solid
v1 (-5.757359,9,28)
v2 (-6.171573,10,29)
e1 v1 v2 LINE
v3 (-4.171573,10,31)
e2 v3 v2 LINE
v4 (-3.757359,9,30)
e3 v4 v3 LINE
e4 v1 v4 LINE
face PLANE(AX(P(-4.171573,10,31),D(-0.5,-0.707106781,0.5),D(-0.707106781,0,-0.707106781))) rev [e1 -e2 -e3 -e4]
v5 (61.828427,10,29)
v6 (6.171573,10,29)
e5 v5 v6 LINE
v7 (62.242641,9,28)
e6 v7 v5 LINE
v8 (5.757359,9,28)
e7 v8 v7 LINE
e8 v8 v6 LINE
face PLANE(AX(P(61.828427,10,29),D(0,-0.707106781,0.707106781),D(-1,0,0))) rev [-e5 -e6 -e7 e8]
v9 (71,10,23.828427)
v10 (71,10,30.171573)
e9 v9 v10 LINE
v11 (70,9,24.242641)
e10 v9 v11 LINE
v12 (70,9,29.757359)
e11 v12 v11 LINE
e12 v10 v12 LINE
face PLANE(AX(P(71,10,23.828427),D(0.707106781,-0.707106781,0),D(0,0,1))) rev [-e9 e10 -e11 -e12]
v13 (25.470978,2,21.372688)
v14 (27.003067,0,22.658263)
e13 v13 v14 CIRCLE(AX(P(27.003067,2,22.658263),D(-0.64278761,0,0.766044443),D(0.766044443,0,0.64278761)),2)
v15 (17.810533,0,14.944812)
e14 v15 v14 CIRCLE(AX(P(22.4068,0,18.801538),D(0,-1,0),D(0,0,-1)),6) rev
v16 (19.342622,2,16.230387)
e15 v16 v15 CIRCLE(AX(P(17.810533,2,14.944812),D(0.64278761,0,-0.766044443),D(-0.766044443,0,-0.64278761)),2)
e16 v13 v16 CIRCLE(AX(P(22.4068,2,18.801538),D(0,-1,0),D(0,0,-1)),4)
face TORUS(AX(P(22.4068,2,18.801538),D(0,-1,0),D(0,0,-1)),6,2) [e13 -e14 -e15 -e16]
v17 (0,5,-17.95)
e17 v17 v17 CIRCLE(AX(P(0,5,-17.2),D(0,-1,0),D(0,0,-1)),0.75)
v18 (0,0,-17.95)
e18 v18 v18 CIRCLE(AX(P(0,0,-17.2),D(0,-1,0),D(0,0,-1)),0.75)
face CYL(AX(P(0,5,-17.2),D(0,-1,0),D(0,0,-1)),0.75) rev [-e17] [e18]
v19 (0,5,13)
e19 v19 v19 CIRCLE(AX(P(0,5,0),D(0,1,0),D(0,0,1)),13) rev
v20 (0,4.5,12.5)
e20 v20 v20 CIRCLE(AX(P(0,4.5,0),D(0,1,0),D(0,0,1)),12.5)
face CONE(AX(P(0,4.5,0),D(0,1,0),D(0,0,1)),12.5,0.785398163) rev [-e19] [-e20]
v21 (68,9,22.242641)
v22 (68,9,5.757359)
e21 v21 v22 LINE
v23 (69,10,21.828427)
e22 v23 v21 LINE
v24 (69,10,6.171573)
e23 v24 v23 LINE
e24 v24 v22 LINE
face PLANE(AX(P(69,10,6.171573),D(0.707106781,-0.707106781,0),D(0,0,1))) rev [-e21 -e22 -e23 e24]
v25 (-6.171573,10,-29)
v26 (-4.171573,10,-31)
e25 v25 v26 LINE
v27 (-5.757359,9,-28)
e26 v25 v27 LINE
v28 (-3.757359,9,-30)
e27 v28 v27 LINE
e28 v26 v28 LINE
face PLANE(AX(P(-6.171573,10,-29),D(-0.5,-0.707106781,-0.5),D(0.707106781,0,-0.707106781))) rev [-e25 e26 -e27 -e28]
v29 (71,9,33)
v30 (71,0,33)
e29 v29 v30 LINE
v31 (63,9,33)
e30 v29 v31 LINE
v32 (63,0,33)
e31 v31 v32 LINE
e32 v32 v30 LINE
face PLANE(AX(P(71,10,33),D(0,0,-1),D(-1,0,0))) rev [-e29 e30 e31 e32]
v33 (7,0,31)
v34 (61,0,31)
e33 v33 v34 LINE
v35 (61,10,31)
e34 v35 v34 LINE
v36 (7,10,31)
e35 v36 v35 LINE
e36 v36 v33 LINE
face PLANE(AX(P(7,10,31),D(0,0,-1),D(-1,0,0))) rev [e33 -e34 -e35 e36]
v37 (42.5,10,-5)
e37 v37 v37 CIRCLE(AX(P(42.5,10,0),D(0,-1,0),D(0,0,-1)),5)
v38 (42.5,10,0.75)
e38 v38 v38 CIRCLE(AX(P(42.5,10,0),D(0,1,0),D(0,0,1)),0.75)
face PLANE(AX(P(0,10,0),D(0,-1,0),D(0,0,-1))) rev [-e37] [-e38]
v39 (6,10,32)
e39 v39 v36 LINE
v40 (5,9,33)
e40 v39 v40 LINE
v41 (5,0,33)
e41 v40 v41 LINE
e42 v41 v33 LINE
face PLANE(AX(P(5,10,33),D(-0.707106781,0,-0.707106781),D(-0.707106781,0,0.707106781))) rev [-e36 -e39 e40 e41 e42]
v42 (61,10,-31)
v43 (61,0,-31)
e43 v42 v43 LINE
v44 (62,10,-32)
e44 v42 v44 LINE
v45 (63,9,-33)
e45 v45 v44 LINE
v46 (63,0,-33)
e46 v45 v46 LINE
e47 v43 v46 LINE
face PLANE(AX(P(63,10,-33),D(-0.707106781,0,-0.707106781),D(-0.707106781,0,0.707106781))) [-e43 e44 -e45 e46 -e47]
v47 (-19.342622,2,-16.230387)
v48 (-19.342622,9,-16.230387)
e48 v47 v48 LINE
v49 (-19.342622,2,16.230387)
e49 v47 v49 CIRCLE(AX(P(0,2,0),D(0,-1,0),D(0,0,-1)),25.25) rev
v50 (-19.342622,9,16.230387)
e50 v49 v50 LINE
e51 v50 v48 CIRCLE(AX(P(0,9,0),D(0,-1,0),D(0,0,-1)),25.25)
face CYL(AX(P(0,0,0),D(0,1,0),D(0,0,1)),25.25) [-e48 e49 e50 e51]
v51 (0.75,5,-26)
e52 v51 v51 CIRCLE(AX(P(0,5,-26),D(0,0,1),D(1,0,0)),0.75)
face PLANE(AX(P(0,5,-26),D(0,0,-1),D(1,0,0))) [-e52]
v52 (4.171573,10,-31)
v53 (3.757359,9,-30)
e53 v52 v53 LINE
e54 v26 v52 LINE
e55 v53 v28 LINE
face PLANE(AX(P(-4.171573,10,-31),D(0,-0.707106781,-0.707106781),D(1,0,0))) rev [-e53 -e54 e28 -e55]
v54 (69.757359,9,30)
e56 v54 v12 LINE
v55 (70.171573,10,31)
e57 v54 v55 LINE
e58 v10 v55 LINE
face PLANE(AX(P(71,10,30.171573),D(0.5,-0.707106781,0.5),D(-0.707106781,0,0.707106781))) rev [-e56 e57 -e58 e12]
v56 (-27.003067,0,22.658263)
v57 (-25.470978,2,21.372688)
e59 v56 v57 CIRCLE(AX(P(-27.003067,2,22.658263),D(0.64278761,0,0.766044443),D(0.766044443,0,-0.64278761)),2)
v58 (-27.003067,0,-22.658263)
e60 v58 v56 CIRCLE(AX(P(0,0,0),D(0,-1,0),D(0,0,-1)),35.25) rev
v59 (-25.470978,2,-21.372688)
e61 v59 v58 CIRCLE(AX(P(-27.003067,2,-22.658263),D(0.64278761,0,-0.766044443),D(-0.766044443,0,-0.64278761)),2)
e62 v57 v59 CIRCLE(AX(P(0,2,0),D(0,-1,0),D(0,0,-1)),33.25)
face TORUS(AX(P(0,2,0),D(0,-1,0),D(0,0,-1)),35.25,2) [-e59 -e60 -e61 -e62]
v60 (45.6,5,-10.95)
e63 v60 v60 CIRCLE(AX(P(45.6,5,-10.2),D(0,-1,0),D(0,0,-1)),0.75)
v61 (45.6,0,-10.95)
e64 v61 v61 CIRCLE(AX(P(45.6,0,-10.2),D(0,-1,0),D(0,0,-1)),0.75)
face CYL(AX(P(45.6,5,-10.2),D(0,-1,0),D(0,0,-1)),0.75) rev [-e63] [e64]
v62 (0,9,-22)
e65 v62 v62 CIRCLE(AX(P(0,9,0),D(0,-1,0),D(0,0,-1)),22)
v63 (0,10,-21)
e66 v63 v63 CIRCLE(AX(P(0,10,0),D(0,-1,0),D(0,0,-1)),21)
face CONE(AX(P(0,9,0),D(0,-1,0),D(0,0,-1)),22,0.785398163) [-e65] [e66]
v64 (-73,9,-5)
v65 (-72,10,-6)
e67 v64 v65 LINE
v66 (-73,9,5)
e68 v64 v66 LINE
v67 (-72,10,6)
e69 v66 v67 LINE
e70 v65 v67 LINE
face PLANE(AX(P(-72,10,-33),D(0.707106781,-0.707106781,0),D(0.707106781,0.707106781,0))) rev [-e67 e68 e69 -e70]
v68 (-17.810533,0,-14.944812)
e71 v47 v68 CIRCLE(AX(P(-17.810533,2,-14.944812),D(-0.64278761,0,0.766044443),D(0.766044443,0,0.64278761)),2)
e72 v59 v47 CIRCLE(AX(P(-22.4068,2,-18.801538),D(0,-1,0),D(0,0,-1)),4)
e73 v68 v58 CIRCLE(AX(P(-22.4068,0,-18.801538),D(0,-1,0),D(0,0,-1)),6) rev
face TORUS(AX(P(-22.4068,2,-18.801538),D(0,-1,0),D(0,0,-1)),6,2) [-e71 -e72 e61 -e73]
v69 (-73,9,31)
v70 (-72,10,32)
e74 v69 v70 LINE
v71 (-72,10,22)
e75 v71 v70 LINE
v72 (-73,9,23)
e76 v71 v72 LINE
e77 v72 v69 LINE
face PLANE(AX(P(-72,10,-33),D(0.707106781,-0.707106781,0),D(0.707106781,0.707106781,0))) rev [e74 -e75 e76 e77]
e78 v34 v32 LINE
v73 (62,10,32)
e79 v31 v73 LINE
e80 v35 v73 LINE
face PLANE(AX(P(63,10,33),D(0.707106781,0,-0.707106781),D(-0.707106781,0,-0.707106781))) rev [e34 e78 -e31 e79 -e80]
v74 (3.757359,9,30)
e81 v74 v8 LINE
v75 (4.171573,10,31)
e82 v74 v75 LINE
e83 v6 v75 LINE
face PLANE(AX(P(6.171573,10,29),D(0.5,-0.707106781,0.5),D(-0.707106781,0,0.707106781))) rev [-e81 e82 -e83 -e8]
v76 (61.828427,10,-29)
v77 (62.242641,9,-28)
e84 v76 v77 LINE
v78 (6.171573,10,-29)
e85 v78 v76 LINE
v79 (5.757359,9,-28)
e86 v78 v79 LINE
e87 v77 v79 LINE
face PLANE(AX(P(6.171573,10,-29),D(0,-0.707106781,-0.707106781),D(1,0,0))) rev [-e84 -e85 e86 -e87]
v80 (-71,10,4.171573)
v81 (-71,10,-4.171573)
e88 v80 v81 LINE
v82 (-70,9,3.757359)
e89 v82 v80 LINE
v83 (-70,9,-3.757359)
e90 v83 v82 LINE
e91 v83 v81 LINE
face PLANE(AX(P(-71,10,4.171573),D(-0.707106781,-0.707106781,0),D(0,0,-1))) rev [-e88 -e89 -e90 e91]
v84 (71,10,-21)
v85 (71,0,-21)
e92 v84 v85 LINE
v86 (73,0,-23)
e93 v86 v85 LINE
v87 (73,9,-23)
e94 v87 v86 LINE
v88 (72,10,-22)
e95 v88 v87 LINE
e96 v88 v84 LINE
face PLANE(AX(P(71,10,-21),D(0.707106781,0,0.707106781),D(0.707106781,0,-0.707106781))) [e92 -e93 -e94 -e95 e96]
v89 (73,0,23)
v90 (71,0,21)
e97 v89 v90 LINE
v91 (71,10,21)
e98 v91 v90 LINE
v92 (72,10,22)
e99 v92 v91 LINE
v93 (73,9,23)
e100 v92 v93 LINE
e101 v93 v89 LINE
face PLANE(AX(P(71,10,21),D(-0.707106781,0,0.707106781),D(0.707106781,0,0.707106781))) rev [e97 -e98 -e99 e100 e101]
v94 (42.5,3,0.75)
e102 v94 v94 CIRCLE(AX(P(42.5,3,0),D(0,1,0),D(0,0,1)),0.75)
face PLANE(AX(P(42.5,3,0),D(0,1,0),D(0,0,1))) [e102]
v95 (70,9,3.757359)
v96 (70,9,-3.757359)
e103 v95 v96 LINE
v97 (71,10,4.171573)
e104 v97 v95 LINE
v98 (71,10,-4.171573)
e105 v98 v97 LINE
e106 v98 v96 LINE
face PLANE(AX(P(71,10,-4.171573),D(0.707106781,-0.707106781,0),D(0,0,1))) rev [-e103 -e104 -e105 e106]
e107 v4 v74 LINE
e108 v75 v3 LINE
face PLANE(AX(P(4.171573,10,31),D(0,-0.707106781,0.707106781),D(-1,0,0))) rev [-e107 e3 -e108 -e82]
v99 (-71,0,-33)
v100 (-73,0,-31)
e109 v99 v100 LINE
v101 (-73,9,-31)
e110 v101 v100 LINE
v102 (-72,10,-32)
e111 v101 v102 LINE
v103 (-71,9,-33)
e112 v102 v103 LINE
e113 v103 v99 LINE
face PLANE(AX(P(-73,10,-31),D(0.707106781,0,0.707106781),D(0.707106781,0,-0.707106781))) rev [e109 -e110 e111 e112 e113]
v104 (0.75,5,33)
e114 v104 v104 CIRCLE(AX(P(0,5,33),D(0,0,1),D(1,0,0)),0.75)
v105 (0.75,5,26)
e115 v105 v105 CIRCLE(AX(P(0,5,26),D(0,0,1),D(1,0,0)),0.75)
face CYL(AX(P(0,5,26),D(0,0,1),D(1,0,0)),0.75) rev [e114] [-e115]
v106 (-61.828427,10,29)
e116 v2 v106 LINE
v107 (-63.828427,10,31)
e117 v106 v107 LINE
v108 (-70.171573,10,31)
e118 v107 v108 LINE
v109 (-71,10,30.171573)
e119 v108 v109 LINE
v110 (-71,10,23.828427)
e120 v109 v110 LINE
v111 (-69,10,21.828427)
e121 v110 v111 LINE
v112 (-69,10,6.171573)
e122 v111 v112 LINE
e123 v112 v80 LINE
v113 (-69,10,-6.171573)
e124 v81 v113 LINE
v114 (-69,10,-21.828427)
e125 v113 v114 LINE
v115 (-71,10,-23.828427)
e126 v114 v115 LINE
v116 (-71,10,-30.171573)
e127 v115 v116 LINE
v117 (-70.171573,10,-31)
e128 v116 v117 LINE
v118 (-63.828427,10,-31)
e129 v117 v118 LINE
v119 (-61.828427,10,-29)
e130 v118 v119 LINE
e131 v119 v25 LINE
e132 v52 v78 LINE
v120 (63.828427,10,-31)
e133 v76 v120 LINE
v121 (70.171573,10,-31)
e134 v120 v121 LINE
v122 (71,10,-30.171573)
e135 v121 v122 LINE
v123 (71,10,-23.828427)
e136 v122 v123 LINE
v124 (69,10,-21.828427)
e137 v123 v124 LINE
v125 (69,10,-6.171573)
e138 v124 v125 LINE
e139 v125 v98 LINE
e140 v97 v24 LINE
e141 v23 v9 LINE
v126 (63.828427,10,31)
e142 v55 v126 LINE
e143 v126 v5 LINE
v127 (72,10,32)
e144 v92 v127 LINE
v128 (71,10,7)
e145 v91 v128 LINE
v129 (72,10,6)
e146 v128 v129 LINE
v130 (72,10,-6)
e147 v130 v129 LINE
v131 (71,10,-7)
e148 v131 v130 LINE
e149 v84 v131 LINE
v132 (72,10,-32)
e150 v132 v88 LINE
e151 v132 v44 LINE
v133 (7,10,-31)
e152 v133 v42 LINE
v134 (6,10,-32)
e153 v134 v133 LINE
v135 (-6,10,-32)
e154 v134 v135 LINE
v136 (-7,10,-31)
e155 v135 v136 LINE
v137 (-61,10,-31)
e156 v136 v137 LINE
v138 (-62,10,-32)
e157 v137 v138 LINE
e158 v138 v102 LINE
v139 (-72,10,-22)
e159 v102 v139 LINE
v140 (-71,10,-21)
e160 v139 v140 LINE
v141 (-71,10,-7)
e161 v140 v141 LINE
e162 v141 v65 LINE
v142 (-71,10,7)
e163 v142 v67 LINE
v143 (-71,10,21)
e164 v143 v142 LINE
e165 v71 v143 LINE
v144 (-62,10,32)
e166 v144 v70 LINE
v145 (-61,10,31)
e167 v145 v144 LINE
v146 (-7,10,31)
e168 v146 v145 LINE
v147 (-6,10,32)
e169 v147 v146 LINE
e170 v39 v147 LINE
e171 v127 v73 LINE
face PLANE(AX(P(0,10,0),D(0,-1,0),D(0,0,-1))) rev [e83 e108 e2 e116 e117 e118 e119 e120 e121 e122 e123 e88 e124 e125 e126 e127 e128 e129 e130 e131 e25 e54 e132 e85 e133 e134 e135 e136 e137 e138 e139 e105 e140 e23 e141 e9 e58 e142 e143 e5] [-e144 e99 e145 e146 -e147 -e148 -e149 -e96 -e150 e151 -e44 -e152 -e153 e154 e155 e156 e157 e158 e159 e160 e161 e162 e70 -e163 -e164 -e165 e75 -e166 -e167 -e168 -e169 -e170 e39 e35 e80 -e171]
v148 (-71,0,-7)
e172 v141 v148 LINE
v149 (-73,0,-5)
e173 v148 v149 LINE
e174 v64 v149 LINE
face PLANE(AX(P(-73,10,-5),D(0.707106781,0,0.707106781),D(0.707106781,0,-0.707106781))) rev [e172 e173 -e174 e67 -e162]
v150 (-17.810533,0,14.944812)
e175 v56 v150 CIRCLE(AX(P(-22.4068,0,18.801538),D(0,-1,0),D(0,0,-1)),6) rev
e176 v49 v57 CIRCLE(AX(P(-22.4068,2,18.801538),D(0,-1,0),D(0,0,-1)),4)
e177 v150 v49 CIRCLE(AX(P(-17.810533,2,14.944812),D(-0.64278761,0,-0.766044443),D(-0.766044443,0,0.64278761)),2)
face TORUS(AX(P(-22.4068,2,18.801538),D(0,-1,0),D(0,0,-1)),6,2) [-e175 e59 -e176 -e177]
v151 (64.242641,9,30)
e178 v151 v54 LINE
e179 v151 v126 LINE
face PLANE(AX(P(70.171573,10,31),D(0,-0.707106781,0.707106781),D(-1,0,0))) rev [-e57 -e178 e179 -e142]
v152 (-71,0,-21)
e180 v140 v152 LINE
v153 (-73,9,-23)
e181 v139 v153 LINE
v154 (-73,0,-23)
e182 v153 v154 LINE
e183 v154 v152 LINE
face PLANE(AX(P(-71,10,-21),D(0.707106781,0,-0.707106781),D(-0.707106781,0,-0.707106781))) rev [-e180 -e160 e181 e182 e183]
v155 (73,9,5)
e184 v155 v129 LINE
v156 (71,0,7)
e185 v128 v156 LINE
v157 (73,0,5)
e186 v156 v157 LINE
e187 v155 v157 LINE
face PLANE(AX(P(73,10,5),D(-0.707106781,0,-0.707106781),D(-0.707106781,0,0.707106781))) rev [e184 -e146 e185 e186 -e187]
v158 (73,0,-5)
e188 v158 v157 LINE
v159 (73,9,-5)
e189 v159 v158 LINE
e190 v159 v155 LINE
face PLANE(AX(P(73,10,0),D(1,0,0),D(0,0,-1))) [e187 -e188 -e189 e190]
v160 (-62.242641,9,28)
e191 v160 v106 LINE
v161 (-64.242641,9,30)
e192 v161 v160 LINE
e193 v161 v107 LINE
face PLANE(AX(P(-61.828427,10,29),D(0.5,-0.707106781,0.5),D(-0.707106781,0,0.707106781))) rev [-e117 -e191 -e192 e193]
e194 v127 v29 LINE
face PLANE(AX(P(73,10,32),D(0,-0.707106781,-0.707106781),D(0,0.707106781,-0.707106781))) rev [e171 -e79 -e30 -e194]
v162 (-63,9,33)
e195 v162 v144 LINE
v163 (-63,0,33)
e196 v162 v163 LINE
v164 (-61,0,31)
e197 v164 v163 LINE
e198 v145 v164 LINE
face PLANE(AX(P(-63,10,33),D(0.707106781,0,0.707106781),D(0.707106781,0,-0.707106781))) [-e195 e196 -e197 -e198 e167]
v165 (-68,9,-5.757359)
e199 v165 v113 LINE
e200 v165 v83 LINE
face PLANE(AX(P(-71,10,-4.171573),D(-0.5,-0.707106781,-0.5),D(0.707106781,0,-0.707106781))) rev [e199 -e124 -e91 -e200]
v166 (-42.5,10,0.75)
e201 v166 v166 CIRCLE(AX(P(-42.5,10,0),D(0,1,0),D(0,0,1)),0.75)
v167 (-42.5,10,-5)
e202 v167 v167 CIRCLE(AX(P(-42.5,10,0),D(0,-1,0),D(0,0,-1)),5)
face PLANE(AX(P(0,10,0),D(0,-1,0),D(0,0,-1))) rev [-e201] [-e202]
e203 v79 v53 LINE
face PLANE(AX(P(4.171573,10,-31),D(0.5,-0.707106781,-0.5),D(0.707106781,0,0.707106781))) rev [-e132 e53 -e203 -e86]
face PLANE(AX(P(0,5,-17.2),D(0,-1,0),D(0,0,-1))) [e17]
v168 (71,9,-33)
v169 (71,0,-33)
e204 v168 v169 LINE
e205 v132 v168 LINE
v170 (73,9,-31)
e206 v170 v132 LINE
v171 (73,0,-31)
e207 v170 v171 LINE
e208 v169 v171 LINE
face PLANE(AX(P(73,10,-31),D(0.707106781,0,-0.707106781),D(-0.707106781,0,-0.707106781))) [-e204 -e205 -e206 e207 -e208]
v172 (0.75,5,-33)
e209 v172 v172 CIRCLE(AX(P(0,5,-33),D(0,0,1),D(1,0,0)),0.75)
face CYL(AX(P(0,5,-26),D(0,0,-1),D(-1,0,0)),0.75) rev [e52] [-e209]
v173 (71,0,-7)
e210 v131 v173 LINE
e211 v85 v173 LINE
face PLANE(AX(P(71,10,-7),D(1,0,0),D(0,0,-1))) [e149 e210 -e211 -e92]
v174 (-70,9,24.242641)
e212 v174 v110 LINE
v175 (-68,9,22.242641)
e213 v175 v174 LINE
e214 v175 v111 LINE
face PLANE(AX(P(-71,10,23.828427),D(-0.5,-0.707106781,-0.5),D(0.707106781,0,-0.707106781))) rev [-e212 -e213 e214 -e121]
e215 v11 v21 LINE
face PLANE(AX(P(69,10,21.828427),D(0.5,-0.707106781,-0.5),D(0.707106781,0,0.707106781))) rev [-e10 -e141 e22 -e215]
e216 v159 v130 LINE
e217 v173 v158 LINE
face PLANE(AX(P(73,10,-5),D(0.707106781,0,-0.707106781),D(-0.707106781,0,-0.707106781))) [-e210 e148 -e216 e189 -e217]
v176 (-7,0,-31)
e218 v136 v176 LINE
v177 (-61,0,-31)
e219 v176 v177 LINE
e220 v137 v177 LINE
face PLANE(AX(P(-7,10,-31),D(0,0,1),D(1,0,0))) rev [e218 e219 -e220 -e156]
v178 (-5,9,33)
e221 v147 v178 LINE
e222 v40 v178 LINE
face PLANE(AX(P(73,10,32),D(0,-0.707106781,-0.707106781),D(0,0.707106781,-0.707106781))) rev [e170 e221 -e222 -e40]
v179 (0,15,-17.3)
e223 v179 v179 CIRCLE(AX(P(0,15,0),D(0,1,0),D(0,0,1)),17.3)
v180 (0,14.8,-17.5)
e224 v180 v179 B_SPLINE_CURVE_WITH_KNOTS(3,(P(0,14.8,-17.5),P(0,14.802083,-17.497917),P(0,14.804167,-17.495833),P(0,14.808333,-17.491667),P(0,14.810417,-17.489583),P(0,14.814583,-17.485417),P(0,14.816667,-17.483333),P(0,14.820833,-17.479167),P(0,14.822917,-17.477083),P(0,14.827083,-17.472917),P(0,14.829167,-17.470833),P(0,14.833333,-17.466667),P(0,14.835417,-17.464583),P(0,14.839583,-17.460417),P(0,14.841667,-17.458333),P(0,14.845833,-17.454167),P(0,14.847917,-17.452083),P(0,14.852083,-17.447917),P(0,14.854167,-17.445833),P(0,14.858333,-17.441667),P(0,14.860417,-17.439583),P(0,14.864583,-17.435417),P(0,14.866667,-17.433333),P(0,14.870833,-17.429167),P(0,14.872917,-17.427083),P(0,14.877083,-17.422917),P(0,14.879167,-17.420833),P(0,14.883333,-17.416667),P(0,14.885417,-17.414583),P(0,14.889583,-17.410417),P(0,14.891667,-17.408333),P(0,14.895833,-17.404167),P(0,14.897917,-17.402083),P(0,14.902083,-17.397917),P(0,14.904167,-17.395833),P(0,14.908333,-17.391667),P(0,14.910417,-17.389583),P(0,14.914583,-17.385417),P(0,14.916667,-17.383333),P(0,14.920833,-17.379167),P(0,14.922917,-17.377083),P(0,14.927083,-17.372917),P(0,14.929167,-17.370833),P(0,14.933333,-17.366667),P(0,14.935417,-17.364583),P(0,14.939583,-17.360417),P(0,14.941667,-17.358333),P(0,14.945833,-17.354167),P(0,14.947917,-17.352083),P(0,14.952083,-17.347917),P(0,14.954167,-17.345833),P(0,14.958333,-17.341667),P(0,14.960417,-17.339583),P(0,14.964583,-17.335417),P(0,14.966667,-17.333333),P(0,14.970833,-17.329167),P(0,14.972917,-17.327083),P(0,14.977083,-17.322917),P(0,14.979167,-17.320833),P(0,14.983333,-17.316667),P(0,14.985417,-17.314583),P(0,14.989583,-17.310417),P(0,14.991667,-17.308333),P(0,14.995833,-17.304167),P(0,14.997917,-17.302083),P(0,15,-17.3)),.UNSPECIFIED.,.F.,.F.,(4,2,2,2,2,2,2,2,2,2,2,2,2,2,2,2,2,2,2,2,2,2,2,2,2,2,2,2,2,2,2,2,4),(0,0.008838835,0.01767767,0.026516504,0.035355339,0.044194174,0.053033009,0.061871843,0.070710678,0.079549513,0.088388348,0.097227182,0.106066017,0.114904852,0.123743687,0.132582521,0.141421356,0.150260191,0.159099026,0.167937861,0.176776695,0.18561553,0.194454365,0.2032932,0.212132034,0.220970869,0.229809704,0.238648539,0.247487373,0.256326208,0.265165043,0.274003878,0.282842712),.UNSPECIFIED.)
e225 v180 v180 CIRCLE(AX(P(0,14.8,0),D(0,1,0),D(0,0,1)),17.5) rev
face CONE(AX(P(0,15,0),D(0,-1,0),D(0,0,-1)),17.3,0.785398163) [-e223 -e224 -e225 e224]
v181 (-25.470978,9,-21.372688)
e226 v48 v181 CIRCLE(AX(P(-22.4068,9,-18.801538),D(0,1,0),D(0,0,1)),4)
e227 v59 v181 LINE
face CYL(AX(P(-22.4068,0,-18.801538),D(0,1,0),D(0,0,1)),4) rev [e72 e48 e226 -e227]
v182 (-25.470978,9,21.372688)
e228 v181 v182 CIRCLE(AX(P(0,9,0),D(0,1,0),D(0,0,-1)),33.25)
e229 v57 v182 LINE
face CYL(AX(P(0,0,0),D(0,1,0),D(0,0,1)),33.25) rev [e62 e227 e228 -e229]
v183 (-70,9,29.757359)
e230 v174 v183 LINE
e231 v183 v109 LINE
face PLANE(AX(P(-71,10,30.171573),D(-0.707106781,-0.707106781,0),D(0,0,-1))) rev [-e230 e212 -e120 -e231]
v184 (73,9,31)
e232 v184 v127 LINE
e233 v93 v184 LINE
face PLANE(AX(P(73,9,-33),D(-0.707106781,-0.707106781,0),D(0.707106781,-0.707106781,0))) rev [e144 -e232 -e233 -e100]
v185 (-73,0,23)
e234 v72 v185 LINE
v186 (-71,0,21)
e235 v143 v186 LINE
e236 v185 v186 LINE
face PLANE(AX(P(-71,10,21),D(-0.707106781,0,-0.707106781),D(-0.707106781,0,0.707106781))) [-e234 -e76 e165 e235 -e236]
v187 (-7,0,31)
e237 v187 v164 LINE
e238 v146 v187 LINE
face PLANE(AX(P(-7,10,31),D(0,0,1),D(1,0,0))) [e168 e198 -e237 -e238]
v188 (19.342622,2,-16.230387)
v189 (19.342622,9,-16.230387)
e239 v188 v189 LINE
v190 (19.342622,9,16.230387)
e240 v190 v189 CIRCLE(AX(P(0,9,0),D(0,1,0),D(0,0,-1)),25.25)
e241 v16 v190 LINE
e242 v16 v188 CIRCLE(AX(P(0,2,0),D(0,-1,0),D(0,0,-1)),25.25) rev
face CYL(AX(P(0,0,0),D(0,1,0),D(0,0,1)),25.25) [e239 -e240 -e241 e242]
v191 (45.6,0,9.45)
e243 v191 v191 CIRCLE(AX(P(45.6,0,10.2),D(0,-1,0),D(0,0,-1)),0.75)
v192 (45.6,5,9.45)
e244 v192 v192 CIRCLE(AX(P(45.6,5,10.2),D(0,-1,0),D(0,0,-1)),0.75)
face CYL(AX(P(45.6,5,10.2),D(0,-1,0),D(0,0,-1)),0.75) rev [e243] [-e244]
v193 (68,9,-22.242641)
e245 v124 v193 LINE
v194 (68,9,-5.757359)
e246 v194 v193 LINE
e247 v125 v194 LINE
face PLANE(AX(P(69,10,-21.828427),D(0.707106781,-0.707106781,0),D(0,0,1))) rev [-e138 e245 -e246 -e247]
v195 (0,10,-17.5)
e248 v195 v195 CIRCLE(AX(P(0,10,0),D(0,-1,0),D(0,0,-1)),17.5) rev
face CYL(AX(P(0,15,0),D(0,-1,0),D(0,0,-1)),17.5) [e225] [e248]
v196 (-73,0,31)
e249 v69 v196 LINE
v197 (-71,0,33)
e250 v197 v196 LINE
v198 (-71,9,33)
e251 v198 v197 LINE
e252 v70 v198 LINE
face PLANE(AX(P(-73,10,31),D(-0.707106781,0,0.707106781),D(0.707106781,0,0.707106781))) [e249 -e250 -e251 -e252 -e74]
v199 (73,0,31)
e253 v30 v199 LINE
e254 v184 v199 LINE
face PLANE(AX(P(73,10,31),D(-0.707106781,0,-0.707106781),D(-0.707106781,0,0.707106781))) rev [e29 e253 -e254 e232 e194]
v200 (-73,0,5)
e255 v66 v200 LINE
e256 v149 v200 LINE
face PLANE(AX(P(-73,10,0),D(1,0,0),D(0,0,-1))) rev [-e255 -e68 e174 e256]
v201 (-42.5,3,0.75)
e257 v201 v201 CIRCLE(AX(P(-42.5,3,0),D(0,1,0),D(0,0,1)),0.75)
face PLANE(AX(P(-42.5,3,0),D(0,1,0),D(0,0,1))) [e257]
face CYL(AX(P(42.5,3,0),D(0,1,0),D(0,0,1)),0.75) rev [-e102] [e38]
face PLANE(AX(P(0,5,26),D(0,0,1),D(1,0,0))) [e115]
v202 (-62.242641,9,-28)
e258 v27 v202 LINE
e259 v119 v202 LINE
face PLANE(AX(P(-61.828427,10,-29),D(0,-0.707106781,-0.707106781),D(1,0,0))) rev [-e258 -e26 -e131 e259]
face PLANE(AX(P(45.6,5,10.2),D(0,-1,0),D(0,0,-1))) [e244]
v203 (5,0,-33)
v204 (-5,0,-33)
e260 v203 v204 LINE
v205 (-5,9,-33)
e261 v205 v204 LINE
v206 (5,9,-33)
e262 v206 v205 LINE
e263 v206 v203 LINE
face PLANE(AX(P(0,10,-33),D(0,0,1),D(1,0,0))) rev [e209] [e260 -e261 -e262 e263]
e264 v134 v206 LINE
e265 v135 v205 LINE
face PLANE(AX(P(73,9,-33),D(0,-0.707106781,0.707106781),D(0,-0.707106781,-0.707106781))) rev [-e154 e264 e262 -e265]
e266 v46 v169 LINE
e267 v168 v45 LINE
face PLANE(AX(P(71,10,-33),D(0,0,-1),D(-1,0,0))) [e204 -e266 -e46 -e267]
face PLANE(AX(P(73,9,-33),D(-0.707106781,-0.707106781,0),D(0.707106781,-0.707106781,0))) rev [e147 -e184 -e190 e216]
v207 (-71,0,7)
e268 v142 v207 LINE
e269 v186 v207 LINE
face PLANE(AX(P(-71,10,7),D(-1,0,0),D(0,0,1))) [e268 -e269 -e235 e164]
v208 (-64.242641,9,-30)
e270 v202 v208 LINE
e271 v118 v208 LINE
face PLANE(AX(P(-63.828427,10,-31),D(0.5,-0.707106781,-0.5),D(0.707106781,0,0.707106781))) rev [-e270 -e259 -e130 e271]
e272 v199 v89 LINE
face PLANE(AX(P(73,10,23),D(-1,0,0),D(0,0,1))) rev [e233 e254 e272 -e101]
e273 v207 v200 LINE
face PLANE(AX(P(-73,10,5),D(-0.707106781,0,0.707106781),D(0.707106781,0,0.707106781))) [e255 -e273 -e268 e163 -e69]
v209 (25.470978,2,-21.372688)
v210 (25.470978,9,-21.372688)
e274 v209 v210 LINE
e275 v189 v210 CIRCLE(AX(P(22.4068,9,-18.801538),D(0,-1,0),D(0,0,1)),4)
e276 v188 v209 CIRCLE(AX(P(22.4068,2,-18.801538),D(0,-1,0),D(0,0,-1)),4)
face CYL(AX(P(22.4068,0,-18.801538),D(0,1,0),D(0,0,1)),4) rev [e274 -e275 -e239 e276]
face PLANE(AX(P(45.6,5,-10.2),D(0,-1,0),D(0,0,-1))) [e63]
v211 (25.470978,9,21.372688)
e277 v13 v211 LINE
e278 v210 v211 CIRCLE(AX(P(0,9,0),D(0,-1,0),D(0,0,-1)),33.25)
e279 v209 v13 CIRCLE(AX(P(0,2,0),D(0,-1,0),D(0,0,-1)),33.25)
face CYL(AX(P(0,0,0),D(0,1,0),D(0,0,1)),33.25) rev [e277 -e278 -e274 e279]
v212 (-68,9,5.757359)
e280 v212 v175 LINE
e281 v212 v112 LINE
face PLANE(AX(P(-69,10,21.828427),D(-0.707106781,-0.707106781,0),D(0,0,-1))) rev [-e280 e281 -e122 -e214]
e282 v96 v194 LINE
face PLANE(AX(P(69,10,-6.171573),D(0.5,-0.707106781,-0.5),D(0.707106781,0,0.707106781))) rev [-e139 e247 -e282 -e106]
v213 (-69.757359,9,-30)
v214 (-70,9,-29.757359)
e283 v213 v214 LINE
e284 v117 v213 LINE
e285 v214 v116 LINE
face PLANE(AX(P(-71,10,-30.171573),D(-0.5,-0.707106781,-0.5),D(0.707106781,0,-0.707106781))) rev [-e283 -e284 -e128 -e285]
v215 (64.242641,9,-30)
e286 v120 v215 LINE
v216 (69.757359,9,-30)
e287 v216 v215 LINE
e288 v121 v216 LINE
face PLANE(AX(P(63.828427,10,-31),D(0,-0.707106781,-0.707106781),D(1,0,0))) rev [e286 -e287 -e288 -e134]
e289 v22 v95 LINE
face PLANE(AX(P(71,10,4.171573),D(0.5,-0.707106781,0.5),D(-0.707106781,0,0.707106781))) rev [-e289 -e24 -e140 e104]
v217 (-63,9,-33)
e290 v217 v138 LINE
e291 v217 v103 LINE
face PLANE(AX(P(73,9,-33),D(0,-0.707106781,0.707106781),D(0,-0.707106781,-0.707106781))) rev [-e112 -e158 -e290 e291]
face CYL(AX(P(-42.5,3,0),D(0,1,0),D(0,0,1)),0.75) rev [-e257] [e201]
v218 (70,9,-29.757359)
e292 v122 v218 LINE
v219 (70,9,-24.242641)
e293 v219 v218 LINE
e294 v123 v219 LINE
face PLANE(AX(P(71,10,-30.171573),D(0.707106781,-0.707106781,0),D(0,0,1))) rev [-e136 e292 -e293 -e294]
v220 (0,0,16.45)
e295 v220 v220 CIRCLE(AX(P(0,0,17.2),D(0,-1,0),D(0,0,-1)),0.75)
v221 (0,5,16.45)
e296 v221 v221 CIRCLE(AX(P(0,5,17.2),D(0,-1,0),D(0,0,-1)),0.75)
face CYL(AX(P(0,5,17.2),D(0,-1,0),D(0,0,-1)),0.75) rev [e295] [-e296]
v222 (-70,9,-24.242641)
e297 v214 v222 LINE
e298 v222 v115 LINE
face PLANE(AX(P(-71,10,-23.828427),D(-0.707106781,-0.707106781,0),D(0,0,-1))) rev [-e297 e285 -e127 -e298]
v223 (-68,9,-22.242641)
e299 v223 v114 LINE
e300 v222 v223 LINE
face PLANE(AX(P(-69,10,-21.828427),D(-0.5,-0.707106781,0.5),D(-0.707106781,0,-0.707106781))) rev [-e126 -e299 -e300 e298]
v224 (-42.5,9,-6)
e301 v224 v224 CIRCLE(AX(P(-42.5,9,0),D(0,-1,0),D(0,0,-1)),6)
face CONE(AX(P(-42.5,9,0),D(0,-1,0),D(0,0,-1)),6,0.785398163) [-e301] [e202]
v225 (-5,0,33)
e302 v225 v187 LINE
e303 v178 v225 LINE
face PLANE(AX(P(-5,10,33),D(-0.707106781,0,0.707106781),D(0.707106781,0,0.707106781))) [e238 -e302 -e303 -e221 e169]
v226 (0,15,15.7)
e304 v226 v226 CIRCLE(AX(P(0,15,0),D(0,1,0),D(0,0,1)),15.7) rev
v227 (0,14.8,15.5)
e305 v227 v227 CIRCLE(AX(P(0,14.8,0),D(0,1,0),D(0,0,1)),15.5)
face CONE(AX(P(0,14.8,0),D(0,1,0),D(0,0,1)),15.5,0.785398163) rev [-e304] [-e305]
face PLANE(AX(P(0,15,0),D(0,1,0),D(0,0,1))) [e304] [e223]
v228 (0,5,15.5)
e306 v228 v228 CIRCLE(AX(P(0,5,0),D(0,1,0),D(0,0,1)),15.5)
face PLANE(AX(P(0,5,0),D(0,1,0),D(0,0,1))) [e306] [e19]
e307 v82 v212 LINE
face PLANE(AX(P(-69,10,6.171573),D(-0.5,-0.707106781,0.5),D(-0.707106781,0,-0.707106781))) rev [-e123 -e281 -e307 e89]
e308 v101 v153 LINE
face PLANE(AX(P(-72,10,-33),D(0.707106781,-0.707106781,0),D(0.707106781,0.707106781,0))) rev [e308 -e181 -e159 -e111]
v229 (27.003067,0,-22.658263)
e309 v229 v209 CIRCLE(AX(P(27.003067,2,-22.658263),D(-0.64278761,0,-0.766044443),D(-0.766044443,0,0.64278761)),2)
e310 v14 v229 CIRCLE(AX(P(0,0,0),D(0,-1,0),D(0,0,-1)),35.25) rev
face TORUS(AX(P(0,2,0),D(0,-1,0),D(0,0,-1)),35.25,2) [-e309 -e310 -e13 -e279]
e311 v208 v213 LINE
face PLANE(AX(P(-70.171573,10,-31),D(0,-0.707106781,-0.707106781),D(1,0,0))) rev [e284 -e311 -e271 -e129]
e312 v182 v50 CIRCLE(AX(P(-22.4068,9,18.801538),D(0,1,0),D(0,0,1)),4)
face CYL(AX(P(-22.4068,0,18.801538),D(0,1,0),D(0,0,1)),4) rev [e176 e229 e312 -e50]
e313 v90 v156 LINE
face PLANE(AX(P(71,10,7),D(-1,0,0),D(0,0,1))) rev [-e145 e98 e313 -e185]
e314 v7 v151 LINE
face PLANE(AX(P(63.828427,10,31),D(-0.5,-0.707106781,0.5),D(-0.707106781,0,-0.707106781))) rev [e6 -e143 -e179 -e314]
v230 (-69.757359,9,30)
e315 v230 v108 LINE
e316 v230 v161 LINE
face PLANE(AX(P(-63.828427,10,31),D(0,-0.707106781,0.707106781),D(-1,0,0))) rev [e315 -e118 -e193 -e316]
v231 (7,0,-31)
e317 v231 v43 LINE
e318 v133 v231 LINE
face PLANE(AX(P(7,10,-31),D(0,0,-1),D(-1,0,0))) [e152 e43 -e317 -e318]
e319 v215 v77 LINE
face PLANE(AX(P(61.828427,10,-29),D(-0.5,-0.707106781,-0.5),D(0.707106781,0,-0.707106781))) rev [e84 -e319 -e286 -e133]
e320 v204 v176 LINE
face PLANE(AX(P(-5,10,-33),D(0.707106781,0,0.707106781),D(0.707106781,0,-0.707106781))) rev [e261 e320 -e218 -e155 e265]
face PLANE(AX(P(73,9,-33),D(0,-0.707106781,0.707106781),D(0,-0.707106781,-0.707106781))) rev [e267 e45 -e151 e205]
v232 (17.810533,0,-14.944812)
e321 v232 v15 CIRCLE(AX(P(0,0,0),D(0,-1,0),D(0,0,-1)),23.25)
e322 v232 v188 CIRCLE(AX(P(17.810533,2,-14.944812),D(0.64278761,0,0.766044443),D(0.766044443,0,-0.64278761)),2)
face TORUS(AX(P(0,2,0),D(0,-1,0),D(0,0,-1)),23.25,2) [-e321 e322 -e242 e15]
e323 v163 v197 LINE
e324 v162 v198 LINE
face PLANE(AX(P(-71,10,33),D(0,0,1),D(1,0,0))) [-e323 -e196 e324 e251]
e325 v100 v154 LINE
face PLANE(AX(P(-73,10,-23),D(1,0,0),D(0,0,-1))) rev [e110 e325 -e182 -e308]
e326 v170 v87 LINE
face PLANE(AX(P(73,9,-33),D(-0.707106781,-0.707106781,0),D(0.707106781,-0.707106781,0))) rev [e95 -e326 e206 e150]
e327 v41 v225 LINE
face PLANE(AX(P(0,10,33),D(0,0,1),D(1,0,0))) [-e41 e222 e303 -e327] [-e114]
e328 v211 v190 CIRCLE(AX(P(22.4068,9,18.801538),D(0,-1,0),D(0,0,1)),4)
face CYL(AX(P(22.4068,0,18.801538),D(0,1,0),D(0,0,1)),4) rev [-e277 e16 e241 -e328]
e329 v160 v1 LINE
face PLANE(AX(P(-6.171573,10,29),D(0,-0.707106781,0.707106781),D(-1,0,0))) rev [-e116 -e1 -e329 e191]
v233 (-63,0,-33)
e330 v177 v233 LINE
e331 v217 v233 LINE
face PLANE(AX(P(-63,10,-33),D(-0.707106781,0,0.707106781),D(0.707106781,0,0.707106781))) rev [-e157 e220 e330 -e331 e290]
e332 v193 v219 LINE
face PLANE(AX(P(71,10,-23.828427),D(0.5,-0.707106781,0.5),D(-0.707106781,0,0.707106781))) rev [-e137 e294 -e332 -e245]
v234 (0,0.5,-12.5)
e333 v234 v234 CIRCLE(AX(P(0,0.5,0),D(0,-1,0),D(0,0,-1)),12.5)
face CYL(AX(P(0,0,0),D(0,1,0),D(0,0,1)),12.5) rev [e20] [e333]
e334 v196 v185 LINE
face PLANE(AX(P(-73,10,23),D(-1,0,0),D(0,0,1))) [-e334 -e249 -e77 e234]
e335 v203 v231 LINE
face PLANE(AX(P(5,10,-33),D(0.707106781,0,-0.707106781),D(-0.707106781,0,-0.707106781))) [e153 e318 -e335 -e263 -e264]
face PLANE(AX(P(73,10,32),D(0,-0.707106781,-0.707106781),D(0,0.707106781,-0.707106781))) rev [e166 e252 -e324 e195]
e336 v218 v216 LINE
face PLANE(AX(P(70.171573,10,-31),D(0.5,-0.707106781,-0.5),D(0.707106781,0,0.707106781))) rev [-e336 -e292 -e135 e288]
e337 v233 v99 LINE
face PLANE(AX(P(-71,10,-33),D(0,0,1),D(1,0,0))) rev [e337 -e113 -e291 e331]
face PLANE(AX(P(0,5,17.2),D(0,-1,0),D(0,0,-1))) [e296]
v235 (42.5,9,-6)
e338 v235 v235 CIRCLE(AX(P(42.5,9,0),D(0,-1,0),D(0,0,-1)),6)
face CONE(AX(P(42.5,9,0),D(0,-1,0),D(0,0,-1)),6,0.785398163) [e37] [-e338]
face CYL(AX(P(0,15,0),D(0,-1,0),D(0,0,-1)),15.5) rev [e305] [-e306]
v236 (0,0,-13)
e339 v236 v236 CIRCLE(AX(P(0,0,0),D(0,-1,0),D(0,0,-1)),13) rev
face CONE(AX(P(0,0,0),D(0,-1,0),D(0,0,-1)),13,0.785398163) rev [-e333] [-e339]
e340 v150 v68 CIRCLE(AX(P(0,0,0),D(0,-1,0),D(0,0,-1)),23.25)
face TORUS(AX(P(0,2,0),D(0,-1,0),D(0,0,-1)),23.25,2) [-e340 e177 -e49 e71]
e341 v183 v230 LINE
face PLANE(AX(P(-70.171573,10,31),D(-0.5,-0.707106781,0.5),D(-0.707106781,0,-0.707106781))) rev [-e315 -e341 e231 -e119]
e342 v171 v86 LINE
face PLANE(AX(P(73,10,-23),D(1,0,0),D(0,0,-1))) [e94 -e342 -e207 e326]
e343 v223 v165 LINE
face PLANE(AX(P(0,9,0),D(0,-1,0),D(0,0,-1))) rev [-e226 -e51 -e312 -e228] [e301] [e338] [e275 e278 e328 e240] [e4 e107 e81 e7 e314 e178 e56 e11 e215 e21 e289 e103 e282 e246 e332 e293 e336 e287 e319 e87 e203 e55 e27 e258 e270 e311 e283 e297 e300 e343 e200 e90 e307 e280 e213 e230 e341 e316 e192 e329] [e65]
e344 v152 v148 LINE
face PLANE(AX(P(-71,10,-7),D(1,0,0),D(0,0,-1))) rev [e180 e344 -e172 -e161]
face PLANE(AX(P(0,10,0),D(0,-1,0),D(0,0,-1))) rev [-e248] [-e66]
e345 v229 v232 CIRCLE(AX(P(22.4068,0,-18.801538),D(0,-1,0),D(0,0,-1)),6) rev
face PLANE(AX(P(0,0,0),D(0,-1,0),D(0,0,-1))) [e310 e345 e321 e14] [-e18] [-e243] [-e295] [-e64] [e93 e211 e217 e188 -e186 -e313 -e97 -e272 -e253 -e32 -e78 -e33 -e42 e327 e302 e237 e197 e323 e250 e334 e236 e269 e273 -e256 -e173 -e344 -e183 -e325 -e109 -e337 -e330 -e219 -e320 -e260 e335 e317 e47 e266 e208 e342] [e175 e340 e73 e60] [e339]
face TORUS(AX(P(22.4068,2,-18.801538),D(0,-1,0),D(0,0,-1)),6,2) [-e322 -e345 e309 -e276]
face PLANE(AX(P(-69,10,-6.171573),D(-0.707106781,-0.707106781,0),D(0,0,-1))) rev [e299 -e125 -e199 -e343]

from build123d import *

# Parameters (mm, degrees)
BOSS_EXTRUDE1_DEPTH  = 10
MIRROR1_DEPTH        = 10
SKETCH2_R            = 17.5
SKETCH2_R_2          = 15.5
BOSS_EXTRUDE2_DEPTH  = 5
CUT_EXTRUDE2_START   = -5
SKETCH3_R            = 15.5
CUT_EXTRUDE2_DEPTH   = 5
SKETCH4_R            = 12.5
CUT_EXTRUDE3_DEPTH   = 81.734131568
CHAMFER2_SIZE        = 0.2
CHAMFER4_SIZE        = 0.5
SKETCH5_R            = 5
SKETCH5_R_2          = 21
CUT_EXTRUDE5_DEPTH   = 1
CHAMFER6_SIZE        = 1
SKETCH6_R            = 0.75
CUT_EXTRUDE6_DEPTH   = 7
SKETCH7_R            = 0.75
CUT_EXTRUDE7_DEPTH   = 7
CUT_EXTRUDE8_DEPTH   = 151.432709209
CUT_EXTRUDE9_DEPTH   = 100.548982918
CUT_EXTRUDE10_DEPTH  = 81.616375508
FILLET3_R            = 2
FILLET3_OF_MIRROR3_R = 2
SKETCH11_R           = 0.75
CUT_EXTRUDE11_DEPTH  = 5


# Read off the part's stored shape, not the designer's step: Mirror1
with BuildPart() as part:
    # Sketch1 → Boss-Extrude1 (new body)
    with BuildSketch(Plane(origin=(0, 0, 0), x_dir=(1, 0, 0), z_dir=(0, 1, 0))):
        Polygon((-73, 31), (-71, 33), (-63, 33), (-61, 31), (-7, 31), (-5, 33), (0, 33), (0, 0), (-73, 0), (-73, 5), (-71, 7), (-71, 21), (-73, 23), align=None)
    extrude(amount=BOSS_EXTRUDE1_DEPTH)

    # Mirror1 outline → Mirror1 (add)
    with BuildSketch(Plane(origin=(0, 0, 0), x_dir=(1, 0, 0), z_dir=(0, 1, 0))):
        Polygon((-73, 0), (-73, -5), (-71, -7), (-71, -21), (-73, -23), (-73, -31), (-71, -33), (-63, -33), (-61, -31), (-7, -31), (-5, -33), (5, -33), (7, -31), (61, -31), (63, -33), (71, -33), (73, -31), (73, -23), (71, -21), (71, -7), (73, -5), (73, 5), (71, 7), (71, 21), (73, 23), (73, 31), (71, 33), (63, 33), (61, 31), (7, 31), (5, 33), (0, 33), (0, 0), align=None)
    extrude(amount=MIRROR1_DEPTH)

    # Sketch2 → Boss-Extrude2 (add)
    with BuildSketch(Plane(origin=(0, 10, 0), x_dir=(1, 0, 0), z_dir=(0, 1, 0))):
        with Locations(Location((0, 0, 0), (0, 0, 90))):
            Circle(SKETCH2_R)
        with Locations(Location((0, 0, 0), (0, 0, 270))):
            Circle(SKETCH2_R_2, mode=Mode.SUBTRACT)
    extrude(amount=BOSS_EXTRUDE2_DEPTH)

    # Sketch3 → Cut-Extrude2 (cut)
    with BuildSketch(Plane(origin=(0, 10, 0), x_dir=(1, 0, 0), z_dir=(0, 1, 0)).offset(CUT_EXTRUDE2_START)):
        with Locations(Location((0, 0, 0), (0, 0, 270))):
            Circle(SKETCH3_R)
    extrude(amount=CUT_EXTRUDE2_DEPTH, mode=Mode.SUBTRACT)

    # Sketch4 → Cut-Extrude3 (cut, through all)
    with BuildSketch(Plane(origin=(0, 5, 0), x_dir=(1, 0, 0), z_dir=(0, 1, 0))):
        with Locations(Location((0, 0, 0), (0, 0, 270))):
            Circle(SKETCH4_R)
    extrude(amount=-CUT_EXTRUDE3_DEPTH, mode=Mode.SUBTRACT)

    # Chamfer2
    chamfer2_edges = [part.edges().sort_by_distance(p)[0] for p in [
        (0, 15, 17.5),
        (0, 15, -15.5),
    ]]
    chamfer(chamfer2_edges, length=CHAMFER2_SIZE)

    # Chamfer4
    chamfer4_edges = [part.edges().sort_by_distance(p)[0] for p in [
        (0, 0, -12.5),
        (0, 5, -12.5),
    ]]
    chamfer(chamfer4_edges, length=CHAMFER4_SIZE)

    # Sketch5 → Cut-Extrude5 (cut)
    with BuildSketch(Plane.XZ.offset(-10)):
        Polygon((71, 4.171572875), (69, 6.171572875), (69, 21.828427125), (71, 23.828427125), (71, 30.171572875), (70.171572875, 31), (63.828427125, 31), (61.828427125, 29), (6.171572875, 29), (4.171572875, 31), (-4.171572875, 31), (-6.171572875, 29), (-61.828427125, 29), (-63.828427125, 31), (-70.171572875, 31), (-71, 30.171572875), (-71, 23.828427125), (-69, 21.828427125), (-69, 6.171572875), (-71, 4.171572875), (-71, -4.171572875), (-69, -6.171572875), (-69, -21.828427125), (-71, -23.828427125), (-71, -30.171572875), (-70.171572875, -31), (-63.828427125, -31), (-61.828427125, -29), (-6.171572875, -29), (-4.171572875, -31), (4.171572875, -31), (6.171572875, -29), (61.828427125, -29), (63.828427125, -31), (70.171572875, -31), (71, -30.171572875), (71, -23.828427125), (69, -21.828427125), (69, -6.171572875), (71, -4.171572875), align=None)
        with Locations(Location((-42.5, 0, 0), (0, 0, 270))):
            Circle(SKETCH5_R, mode=Mode.SUBTRACT)
        with Locations(Location((42.5, 0, 0), (0, 0, 270))):
            Circle(SKETCH5_R, mode=Mode.SUBTRACT)
        with Locations(Location((0, 0, 0), (0, 0, 270))):
            Circle(SKETCH5_R_2, mode=Mode.SUBTRACT)
    extrude(amount=CUT_EXTRUDE5_DEPTH, mode=Mode.SUBTRACT)

    # Chamfer6
    chamfer6_edges = [part.edges().sort_by_distance(p)[0] for p in [
        (0, 9, 21),
        (67, 9, 31),
        (62.828427125, 9, 30),
        (34, 9, 29),
        (5.171572875, 9, 30),
        (0, 9, 31),
        (-5.171572875, 9, 30),
        (-34, 9, 29),
        (-62.828427125, 9, 30),
        (-67, 9, 31),
        (-71, 9, 27),
        (-70, 9, 22.828427125),
        (-69, 9, 14),
        (-70, 9, 5.171572875),
        (-71, 9, 0),
        (-70, 9, -5.171572875),
        (-69, 9, -14),
        (-70, 9, -22.828427125),
        (-71, 9, -27),
        (-67, 9, -31),
        (-62.828427125, 9, -30),
        (-34, 9, -29),
        (-5.171572875, 9, -30),
        (0, 9, -31),
        (5.171572875, 9, -30),
        (34, 9, -29),
        (62.828427125, 9, -30),
        (67, 9, -31),
        (71, 9, -27),
        (70, 9, -22.828427125),
        (69, 9, -14),
        (70, 9, -5.171572875),
        (71, 9, 0),
        (70, 9, 5.171572875),
        (69, 9, 14),
        (70, 9, 22.828427125),
        (71, 9, 27),
        (70.585786438, 9, 30.585786438),
        (-70.585786438, 9, 30.585786438),
        (-70.585786438, 9, -30.585786438),
        (70.585786438, 9, -30.585786438),
        (-42.5, 9, 5),
        (42.5, 9, 5),
    ]]
    chamfer(chamfer6_edges, length=CHAMFER6_SIZE - 0.0001)  # a hair under: the kernel refuses the full size

    # Sketch6 → Cut-Extrude6 (cut)
    with BuildSketch(Plane.XY.offset(33)):
        with Locations((0, 5)):
            Circle(SKETCH6_R)
    cut_extrude6 = extrude(amount=-CUT_EXTRUDE6_DEPTH, mode=Mode.SUBTRACT)

    # Mirror2: Cut-Extrude6 across plane
    add(cut_extrude6.mirror(Plane.XY), mode=Mode.SUBTRACT)

    # Sketch7 → Cut-Extrude7 (cut)
    with BuildSketch(Plane(origin=(0, 10, 0), x_dir=(1, 0, 0), z_dir=(0, 1, 0))):
        with Locations(Location((-42.5, 0, 0), (0, 0, 270))):
            Circle(SKETCH7_R)
        with Locations(Location((42.5, 0, 0), (0, 0, 270))):
            Circle(SKETCH7_R)
    extrude(amount=-CUT_EXTRUDE7_DEPTH, mode=Mode.SUBTRACT)

    # Sketch8 → Cut-Extrude8 (cut, through all)
    with BuildSketch(Plane.ZY.offset(73)):
        Polygon((-33, 9), (-32, 10), (-33, 10), align=None)
        Polygon((33, 10), (32, 10), (33, 9), align=None)
    extrude(amount=-CUT_EXTRUDE8_DEPTH, mode=Mode.SUBTRACT)

    # Sketch9 → Cut-Extrude9 (cut, through all)
    with BuildSketch(Plane.XY.offset(33)):
        Polygon((-73, 10), (-72, 10), (-73, 9), align=None)
        Polygon((72, 10), (73, 10), (73, 9), align=None)
    extrude(amount=-CUT_EXTRUDE9_DEPTH, mode=Mode.SUBTRACT)

    # Sketch10 → Cut-Extrude10 (cut, through all)
    with BuildSketch(Plane(origin=(0, 9, 0), x_dir=(1, 0, 0), z_dir=(0, 1, 0))):
        with BuildLine():
            ThreePointArc((-19.342622189, 16.230387145), (-19.835649522, 21.865715356), (-25.470977734, 21.372688022))
            ThreePointArc((-25.470977734, 21.372688022), (-33.25, 0), (-25.470977734, -21.372688022))
            ThreePointArc((-25.470977734, -21.372688022), (-19.835649522, -21.865715356), (-19.342622189, -16.230387145))
            ThreePointArc((-19.342622189, -16.230387145), (-25.25, 0), (-19.342622189, 16.230387145))
        make_face()
    cut_extrude10 = extrude(amount=-CUT_EXTRUDE10_DEPTH, mode=Mode.SUBTRACT)

    # Fillet3
    fillet3_edges = [part.edges().sort_by_distance(p)[0] for p in [
        (-33.25, 0, 0),
        (-19.835649522, 0, -21.865715356),
        (-25.25, 0, 0),
        (-19.835649522, 0, 21.865715356),
    ]]
    fillet(fillet3_edges, radius=FILLET3_R)

    # Mirror3: Cut-Extrude10 across plane
    add(cut_extrude10.mirror(Plane(origin=(0, 0, 0), x_dir=(0, 0, 1), z_dir=(1, 0, 0))), mode=Mode.SUBTRACT)

    # Fillet3 of Mirror3
    fillet3_of_mirror3_edges = [part.edges().sort_by_distance(p)[0] for p in [
        (33.25, 0, 0),
        (19.835649522, 0, -21.865715356),
        (25.25, 0, 0),
        (19.835649522, 0, 21.865715356),
    ]]
    fillet(fillet3_of_mirror3_edges, radius=FILLET3_OF_MIRROR3_R)

    # Sketch11 → Cut-Extrude11 (cut)
    with BuildSketch(Plane.XZ):
        with Locations(Location((0, 17.2, 0), (0, 0, 270))):
            Circle(SKETCH11_R)
        with Locations(Location((45.6, 10.2, 0), (0, 0, 270))):
            Circle(SKETCH11_R)
        with Locations(Location((45.6, -10.2, 0), (0, 0, 270))):
            Circle(SKETCH11_R)
        with Locations(Location((0, -17.2, 0), (0, 0, 270))):
            Circle(SKETCH11_R)
    extrude(amount=-CUT_EXTRUDE11_DEPTH, mode=Mode.SUBTRACT)


solid = part.part
